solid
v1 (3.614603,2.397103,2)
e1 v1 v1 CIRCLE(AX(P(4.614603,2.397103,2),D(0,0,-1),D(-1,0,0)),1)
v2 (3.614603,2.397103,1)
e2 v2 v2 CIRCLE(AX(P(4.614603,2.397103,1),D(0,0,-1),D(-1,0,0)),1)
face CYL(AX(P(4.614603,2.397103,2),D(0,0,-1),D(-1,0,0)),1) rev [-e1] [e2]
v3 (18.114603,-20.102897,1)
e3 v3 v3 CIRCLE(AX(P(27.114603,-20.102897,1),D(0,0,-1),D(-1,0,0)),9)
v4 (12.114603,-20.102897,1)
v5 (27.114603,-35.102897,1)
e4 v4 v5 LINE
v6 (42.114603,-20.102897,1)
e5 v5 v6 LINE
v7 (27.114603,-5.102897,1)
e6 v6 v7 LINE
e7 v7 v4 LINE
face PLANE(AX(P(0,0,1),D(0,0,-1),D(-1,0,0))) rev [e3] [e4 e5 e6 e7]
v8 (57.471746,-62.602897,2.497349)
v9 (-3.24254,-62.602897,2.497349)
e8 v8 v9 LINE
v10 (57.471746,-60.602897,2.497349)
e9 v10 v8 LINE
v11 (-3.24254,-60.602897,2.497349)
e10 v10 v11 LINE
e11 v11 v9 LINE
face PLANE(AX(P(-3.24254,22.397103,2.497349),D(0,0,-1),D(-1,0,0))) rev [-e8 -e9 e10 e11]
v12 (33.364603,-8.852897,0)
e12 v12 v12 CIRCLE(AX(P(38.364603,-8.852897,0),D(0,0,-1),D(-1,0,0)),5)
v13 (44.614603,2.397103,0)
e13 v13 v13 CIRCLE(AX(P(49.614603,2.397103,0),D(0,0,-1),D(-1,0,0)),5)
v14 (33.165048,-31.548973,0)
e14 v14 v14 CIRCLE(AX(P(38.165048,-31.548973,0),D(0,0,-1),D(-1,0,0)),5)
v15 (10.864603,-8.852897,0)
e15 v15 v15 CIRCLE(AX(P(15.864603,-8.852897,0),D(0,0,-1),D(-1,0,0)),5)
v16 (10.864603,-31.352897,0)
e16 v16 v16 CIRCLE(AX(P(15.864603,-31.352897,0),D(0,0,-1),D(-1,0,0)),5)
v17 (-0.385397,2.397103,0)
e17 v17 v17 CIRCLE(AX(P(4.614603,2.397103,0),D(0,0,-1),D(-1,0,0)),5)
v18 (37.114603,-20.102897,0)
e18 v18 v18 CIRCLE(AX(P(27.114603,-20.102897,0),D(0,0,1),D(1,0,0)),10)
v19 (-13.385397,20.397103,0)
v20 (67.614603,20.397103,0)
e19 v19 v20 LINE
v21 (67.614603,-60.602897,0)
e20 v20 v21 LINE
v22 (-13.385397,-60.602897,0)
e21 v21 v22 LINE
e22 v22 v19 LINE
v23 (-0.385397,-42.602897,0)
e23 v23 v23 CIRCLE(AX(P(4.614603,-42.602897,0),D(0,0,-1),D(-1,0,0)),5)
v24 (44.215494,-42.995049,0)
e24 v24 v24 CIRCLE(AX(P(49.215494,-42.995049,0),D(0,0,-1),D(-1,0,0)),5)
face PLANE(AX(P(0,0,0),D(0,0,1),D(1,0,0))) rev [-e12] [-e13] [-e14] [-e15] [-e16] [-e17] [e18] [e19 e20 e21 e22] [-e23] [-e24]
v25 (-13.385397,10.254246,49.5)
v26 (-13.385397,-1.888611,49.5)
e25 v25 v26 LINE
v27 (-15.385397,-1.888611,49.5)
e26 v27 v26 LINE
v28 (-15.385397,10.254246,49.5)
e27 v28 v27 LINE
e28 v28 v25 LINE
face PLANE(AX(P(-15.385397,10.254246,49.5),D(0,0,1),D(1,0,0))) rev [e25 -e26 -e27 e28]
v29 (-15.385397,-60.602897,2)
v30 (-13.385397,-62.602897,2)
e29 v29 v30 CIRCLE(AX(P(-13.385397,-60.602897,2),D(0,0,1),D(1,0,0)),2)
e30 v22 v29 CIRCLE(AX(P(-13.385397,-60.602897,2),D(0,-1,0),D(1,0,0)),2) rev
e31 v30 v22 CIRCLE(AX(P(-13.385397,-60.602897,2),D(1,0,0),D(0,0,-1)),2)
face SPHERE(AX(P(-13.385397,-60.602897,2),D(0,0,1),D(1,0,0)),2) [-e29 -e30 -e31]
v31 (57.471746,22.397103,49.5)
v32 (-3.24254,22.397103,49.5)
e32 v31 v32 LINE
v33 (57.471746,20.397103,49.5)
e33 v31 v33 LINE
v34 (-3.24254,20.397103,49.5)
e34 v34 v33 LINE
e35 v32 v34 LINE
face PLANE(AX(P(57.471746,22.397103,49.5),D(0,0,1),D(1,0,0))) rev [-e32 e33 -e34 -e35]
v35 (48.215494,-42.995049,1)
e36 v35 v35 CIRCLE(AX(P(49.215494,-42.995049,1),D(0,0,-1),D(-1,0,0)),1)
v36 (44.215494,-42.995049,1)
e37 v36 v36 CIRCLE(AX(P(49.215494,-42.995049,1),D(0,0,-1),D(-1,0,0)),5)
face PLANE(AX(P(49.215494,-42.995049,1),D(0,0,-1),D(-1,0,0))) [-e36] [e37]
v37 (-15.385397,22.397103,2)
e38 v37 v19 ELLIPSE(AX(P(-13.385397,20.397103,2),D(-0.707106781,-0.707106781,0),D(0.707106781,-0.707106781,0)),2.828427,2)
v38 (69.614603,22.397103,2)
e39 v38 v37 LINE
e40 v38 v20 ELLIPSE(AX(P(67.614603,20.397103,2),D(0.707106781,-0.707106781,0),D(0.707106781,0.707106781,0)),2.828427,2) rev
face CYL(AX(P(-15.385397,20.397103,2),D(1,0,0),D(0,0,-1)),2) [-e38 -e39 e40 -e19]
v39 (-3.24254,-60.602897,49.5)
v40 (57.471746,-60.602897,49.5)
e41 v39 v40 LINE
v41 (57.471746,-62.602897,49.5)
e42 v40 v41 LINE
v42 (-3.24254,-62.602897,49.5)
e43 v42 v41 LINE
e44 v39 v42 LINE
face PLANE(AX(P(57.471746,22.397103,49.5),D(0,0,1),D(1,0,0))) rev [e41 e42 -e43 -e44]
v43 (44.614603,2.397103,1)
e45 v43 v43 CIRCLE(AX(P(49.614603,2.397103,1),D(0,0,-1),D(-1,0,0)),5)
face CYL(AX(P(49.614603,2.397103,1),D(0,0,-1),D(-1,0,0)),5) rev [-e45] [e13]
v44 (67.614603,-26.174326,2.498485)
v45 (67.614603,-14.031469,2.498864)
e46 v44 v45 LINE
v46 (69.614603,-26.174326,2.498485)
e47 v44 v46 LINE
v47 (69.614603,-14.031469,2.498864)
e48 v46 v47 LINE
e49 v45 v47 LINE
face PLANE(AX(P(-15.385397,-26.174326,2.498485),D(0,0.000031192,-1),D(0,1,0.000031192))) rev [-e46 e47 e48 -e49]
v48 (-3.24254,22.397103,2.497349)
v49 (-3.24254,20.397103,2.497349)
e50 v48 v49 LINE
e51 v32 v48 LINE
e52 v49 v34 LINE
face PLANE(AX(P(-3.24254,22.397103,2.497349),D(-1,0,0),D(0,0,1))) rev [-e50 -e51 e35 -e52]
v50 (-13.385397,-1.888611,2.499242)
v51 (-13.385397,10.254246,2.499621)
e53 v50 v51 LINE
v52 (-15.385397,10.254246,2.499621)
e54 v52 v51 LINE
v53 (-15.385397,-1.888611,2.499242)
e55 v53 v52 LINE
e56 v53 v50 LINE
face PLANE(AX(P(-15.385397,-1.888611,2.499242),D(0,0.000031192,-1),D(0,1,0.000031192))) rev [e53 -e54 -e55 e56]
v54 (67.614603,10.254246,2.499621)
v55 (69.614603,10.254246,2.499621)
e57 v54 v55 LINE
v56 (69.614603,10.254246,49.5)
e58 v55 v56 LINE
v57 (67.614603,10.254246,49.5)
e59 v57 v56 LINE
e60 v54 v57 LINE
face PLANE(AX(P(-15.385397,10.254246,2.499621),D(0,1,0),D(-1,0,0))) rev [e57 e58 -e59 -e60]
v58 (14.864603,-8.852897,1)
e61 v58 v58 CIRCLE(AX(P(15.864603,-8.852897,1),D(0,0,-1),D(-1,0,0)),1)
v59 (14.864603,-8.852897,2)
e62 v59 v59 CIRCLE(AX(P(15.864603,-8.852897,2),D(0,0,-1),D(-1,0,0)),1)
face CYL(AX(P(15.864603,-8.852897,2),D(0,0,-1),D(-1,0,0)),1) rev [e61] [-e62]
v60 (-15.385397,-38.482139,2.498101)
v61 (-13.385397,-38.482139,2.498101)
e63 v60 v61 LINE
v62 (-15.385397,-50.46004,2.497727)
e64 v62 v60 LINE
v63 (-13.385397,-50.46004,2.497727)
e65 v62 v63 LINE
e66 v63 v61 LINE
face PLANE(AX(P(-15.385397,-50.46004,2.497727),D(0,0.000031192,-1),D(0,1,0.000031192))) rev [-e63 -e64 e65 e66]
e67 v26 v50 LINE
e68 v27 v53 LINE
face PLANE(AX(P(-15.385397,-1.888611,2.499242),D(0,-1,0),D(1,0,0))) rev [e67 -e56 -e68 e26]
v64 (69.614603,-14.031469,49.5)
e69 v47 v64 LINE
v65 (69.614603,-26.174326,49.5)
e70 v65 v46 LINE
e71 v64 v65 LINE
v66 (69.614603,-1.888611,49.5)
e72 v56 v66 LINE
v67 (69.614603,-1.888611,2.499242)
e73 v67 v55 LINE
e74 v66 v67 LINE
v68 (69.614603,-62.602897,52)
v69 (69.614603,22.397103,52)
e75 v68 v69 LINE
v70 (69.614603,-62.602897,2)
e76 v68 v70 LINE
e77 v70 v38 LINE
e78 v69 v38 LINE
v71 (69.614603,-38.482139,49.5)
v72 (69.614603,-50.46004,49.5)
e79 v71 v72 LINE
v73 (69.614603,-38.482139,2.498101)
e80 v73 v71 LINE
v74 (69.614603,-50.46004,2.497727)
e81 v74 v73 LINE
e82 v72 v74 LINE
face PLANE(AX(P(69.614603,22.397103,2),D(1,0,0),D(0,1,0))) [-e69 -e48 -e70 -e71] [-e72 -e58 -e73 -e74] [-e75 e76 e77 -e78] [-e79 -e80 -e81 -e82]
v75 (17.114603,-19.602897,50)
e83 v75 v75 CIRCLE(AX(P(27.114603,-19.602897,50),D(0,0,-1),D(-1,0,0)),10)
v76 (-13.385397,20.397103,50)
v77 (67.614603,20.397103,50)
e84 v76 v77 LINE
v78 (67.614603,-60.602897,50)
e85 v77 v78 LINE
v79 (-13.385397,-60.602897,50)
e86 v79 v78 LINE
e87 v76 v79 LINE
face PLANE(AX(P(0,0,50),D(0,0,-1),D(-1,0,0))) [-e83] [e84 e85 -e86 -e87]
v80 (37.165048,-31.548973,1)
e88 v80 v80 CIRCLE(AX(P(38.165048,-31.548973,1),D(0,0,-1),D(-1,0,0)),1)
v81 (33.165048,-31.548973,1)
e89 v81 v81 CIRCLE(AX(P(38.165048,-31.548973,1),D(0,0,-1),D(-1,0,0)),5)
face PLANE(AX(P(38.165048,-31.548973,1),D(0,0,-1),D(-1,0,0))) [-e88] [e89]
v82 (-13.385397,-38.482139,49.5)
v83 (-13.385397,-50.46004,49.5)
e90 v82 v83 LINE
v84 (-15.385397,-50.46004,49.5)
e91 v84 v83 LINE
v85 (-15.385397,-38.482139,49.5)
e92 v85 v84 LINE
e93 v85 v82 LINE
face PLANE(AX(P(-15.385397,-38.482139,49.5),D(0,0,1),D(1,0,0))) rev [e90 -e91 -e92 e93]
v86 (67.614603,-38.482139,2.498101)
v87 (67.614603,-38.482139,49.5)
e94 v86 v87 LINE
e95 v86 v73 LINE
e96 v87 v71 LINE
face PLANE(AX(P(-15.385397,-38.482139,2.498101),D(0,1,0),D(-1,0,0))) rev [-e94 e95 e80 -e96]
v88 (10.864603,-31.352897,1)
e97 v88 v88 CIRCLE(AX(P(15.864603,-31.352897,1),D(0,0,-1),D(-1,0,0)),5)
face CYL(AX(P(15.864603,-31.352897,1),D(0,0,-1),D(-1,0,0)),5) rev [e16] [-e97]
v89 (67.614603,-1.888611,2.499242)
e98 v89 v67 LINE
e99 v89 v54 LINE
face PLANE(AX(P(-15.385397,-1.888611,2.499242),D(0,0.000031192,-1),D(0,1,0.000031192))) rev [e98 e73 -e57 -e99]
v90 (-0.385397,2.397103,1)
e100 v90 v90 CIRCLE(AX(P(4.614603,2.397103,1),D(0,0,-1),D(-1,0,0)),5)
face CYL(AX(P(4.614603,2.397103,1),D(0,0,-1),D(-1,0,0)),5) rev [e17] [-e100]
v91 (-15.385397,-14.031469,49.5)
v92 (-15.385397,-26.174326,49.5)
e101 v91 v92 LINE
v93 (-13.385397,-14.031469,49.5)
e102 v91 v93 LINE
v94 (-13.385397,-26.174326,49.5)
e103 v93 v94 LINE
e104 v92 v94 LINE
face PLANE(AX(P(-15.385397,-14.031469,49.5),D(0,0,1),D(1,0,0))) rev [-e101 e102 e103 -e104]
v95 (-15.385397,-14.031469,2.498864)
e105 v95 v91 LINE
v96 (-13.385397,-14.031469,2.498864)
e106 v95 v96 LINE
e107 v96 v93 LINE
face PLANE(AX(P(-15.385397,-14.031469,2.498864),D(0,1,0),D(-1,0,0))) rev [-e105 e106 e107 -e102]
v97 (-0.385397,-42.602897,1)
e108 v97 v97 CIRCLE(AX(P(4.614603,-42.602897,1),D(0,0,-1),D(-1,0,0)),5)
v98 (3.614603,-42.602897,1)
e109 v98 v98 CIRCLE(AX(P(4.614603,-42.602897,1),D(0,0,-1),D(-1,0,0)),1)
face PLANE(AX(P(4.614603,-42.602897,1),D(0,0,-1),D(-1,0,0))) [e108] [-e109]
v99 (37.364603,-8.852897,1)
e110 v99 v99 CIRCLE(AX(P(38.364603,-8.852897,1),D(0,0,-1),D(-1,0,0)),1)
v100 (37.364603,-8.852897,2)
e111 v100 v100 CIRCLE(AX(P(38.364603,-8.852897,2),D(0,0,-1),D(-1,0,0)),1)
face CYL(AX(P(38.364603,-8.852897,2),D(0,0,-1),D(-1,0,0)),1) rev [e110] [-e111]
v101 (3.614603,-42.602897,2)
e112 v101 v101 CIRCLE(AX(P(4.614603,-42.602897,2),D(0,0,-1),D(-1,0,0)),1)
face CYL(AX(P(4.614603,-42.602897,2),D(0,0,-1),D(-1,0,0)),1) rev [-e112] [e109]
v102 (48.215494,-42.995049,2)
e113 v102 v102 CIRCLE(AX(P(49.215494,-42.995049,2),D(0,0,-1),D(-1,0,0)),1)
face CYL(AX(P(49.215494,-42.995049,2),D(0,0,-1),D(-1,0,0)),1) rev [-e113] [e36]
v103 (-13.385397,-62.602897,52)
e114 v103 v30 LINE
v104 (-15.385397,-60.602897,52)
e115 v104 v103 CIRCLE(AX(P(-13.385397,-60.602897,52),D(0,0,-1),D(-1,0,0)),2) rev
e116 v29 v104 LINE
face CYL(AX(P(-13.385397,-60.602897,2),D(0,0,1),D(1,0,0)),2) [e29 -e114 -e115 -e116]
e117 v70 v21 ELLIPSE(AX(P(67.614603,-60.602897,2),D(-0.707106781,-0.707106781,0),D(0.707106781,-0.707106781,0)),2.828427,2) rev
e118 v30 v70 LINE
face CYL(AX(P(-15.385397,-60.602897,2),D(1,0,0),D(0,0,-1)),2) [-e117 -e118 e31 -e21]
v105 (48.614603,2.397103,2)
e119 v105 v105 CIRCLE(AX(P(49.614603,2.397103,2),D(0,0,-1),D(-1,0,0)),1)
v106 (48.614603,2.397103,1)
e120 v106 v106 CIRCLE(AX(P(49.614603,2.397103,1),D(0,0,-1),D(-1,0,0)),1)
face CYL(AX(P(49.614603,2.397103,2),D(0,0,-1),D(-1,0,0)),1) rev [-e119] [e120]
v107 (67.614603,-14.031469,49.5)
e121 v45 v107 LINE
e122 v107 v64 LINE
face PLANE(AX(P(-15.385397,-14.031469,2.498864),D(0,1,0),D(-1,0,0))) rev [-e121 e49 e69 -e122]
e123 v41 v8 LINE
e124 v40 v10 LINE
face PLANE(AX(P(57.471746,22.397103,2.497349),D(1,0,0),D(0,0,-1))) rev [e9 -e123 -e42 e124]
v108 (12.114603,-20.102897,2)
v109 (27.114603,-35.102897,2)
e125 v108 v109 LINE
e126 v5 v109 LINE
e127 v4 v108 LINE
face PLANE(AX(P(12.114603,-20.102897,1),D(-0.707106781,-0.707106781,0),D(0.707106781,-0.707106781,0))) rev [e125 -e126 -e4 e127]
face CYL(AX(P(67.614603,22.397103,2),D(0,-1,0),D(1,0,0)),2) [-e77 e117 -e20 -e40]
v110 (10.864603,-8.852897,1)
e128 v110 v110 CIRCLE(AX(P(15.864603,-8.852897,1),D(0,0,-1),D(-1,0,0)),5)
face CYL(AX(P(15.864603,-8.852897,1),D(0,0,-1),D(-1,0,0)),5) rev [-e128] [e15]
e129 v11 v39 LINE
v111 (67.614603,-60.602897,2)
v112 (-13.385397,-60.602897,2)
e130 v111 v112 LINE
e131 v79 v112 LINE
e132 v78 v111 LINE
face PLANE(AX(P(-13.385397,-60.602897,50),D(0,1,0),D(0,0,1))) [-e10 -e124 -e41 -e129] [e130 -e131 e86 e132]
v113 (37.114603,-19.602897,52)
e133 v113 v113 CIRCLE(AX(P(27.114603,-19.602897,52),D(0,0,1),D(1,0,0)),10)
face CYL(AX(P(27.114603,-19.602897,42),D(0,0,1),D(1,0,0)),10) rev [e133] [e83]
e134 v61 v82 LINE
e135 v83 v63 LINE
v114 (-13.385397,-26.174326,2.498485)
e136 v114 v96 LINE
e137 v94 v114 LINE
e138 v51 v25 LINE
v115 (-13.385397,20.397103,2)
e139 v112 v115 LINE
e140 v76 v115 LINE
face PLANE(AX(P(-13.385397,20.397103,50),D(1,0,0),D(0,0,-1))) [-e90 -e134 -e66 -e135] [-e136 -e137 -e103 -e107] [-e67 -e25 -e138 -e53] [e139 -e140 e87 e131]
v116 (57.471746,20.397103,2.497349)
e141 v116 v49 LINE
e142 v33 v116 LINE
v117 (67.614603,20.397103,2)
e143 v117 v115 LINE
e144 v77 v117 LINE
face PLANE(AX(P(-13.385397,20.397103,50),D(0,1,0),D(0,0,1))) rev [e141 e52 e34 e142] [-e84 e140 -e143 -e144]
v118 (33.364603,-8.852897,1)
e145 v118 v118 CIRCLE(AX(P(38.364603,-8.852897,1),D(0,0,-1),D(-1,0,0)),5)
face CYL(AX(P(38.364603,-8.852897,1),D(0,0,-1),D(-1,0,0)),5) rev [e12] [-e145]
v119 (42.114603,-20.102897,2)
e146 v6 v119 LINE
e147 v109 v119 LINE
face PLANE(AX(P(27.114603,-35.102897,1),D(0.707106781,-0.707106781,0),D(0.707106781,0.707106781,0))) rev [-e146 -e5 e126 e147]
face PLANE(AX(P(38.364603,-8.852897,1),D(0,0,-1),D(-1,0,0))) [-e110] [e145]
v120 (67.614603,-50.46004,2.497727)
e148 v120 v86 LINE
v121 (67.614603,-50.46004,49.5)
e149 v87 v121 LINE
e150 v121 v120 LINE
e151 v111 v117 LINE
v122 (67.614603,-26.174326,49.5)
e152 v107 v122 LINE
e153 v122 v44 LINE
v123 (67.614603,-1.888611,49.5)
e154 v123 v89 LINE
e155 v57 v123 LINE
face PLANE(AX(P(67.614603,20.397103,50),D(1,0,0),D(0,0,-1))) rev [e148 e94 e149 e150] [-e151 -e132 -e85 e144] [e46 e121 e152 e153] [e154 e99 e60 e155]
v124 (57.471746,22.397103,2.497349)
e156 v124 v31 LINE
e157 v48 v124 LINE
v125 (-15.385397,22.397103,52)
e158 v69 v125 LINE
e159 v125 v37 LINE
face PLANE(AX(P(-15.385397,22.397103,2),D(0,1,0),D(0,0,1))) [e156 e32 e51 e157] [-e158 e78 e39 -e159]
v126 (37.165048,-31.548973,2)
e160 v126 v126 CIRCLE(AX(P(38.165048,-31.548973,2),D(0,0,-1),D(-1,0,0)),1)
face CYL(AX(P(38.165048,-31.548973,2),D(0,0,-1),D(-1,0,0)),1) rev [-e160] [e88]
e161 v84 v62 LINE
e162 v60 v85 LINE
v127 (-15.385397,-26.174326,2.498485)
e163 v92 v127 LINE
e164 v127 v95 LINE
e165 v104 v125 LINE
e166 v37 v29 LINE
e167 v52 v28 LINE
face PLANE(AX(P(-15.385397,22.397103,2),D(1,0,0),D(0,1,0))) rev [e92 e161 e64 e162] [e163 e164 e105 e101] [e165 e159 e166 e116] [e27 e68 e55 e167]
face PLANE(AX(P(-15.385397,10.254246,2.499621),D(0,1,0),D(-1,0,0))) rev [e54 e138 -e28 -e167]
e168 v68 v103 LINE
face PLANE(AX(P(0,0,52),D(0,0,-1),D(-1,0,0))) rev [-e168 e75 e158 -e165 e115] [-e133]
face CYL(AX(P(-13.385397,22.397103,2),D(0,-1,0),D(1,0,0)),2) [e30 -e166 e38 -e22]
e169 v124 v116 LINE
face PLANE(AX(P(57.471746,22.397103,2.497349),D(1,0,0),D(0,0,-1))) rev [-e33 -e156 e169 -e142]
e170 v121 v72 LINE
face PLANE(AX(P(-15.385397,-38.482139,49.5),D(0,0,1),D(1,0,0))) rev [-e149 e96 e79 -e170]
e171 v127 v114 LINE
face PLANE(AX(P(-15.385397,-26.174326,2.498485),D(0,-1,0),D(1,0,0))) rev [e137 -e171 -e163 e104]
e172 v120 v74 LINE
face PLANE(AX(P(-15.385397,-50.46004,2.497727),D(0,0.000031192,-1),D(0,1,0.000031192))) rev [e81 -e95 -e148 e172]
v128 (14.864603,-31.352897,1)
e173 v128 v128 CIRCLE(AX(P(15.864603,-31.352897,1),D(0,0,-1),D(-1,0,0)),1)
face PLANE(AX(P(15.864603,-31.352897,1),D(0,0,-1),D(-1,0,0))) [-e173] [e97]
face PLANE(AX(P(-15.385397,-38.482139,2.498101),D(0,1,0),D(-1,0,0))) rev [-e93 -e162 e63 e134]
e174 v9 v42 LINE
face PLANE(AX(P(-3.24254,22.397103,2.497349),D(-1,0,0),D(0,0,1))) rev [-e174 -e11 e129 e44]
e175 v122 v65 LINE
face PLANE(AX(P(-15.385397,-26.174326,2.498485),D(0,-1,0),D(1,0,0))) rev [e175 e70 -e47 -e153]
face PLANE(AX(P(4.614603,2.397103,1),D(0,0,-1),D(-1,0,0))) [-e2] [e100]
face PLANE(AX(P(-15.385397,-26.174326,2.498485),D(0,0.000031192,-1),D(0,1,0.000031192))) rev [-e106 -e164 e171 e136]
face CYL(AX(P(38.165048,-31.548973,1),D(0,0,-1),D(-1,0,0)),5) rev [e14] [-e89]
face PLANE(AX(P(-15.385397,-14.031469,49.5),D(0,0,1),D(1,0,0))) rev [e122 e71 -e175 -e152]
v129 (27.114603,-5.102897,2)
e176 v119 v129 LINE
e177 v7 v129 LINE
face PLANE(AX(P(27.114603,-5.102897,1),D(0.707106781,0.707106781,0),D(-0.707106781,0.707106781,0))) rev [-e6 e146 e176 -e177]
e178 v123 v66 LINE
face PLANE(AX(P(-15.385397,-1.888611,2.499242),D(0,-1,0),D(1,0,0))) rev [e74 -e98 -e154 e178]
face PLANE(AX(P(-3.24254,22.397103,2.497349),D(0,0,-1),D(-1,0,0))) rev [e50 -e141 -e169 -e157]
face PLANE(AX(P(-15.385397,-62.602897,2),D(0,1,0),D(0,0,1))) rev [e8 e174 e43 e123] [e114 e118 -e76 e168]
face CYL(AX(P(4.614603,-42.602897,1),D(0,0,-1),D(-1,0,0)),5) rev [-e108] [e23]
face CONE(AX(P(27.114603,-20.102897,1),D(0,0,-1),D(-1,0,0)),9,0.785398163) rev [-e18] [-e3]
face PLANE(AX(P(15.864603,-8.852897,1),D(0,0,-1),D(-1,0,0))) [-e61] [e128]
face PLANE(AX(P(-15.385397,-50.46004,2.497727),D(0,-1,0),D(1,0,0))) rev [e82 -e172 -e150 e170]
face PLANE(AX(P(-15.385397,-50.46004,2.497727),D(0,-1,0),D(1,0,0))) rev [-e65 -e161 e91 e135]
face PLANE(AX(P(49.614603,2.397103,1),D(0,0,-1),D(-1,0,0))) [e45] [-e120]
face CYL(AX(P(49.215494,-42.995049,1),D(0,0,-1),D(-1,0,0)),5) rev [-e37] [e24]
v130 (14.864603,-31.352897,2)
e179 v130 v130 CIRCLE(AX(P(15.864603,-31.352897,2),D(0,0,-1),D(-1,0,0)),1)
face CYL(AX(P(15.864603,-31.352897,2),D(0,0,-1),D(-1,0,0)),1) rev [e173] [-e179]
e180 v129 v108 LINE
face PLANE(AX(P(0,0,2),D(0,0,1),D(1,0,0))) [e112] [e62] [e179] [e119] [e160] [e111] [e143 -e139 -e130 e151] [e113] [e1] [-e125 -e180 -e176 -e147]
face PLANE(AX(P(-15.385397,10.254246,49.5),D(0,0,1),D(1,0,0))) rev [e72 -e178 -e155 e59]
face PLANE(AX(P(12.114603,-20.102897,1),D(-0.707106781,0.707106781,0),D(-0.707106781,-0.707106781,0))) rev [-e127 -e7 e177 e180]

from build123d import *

# Parameters (mm, degrees)
SKETCH_1_W               = 85
SKETCH_1_H               = 85
EXTRUDE_1_DEPTH          = 2
SKETCH_2_R               = 9
CUT_EXTRUDE_1_DEPTH      = 2
SKETCH_4_R               = 5
CUT_EXTRUDE_4_DEPTH      = 1
SKETCH_5_R               = 1
CUT_EXTRUDE_5_DEPTH      = 94.644624303
SKETCH_1_3_W             = 85
SKETCH_1_3_H             = 85
SKETCH_1_3_W_2           = 81
SKETCH_1_3_H_2           = 81
EXTRUDE_2_DEPTH          = 50
SKETCH_7_W               = 85
SKETCH_7_H               = 85
EXTRUDE_3_DEPTH          = 2
CUT_EXTRUDE_6_DEPTH      = 118.678046964
CUT_EXTRUDE_6_DEPTH_BACK = 118.678046964
CUT_EXTRUDE_7_DEPTH      = 122.55325139
CUT_EXTRUDE_7_DEPTH_BACK = 122.55325139
SKETCH_10_W              = 60.714285714
SKETCH_10_H              = 47.002651285
CHAMFER_4_SIZE           = 1
FILLET_1_R               = 2
FILLET_2_R               = 2
SKETCH_11_R              = 10
CUT_EXTRUDE_8_DEPTH      = 10
CUT_EXTRUDE_9_DEPTH      = 1


with BuildPart() as part:
    # 草图1 → 凸台-拉伸1 (new body)
    with BuildSketch(Plane.XY):
        with Locations((27.114602804, -20.102897196)):
            Rectangle(SKETCH_1_W, SKETCH_1_H)
    extrude(amount=EXTRUDE_1_DEPTH)

    # 草图2 → 切除-拉伸1 (cut)
    with BuildSketch(Plane(origin=(0, 0, 0), x_dir=(-1, 0, 0), z_dir=(0, 0, -1))):
        with Locations((-27.114602804, -20.102897196)):
            Circle(SKETCH_2_R)
    extrude(amount=-CUT_EXTRUDE_1_DEPTH, mode=Mode.SUBTRACT)

    # 草图4 → 切除-拉伸4 (cut)
    with BuildSketch(Plane(origin=(0, 0, 0), x_dir=(-1, 0, 0), z_dir=(0, 0, -1))):
        with Locations((-49.215493554, -42.995049302)):
            Circle(SKETCH_4_R)
        with Locations((-38.165048179, -31.548973249)):
            Circle(SKETCH_4_R)
        with Locations((-49.614602804, 2.397102804)):
            Circle(SKETCH_4_R)
        with Locations((-38.364602804, -8.852897196)):
            Circle(SKETCH_4_R)
        with Locations((-4.614602804, -42.602897196)):
            Circle(SKETCH_4_R)
        with Locations((-15.864602804, -31.352897196)):
            Circle(SKETCH_4_R)
        with Locations((-4.614602804, 2.397102804)):
            Circle(SKETCH_4_R)
        with Locations((-15.864602804, -8.852897196)):
            Circle(SKETCH_4_R)
    extrude(amount=-CUT_EXTRUDE_4_DEPTH, mode=Mode.SUBTRACT)

    # 草图5 → 切除-拉伸5 (cut, through all)
    with BuildSketch(Plane(origin=(0, 0, 0), x_dir=(-1, 0, 0), z_dir=(0, 0, -1))):
        with Locations((-4.614602804, -42.602897196)):
            Circle(SKETCH_5_R)
        with Locations((-15.864602804, -31.352897196)):
            Circle(SKETCH_5_R)
        with Locations((-15.864602804, -8.852897196)):
            Circle(SKETCH_5_R)
        with Locations((-4.614602804, 2.397102804)):
            Circle(SKETCH_5_R)
        with Locations((-38.364602804, -8.852897196)):
            Circle(SKETCH_5_R)
        with Locations((-49.614602804, 2.397102804)):
            Circle(SKETCH_5_R)
        with Locations((-49.215493554, -42.995049302)):
            Circle(SKETCH_5_R)
        with Locations((-38.165048179, -31.548973249)):
            Circle(SKETCH_5_R)
    extrude(amount=-CUT_EXTRUDE_5_DEPTH, mode=Mode.SUBTRACT)

    # 草图1<3> → 凸台-拉伸2 (add)
    with BuildSketch(Plane.XY):
        with Locations((27.114602804, -20.102897196)):
            Rectangle(SKETCH_1_3_W, SKETCH_1_3_H)
        with Locations((27.114602804, -20.102897196)):
            Rectangle(SKETCH_1_3_W_2, SKETCH_1_3_H_2, mode=Mode.SUBTRACT)
    extrude(amount=EXTRUDE_2_DEPTH)

    # 草图7 → 凸台-拉伸3 (add)
    with BuildSketch(Plane.XY.offset(50)):
        with Locations((27.114602804, -20.102897196)):
            Rectangle(SKETCH_7_W, SKETCH_7_H)
    extrude(amount=EXTRUDE_3_DEPTH)

    # 草图9 → 切除-拉伸6 (cut, two sides: drawn at the far end of the back side and taken through both)
    with BuildSketch(Plane(origin=(69.614602804, 0, 0), x_dir=(0, 0, -1), z_dir=(1, 0, 0)).offset(-CUT_EXTRUDE_6_DEPTH_BACK)):
        Polygon((-2.49772747, -50.460040053), (-49.5, -50.460040053), (-49.5, -38.482138921), (-2.49810108, -38.482138921), align=None)
        Polygon((-2.49848498, -26.174325768), (-49.5, -26.174325768), (-49.5, -14.031468625), (-2.498863735, -14.031468625), align=None)
        Polygon((-2.49924249, -1.888611482), (-49.5, -1.888611482), (-49.5, 10.254245661), (-2.499621245, 10.254245661), align=None)
    extrude(amount=CUT_EXTRUDE_6_DEPTH + CUT_EXTRUDE_6_DEPTH_BACK, mode=Mode.SUBTRACT)

    # 草图10 → 切除-拉伸7 (cut, two sides: drawn at the far end of the back side and taken through both)
    with BuildSketch(Plane.XZ.offset(62.602897196).offset(-CUT_EXTRUDE_7_DEPTH_BACK)):
        with Locations((27.114602804, 25.998674358)):
            Rectangle(SKETCH_10_W, SKETCH_10_H)
    extrude(amount=CUT_EXTRUDE_7_DEPTH + CUT_EXTRUDE_7_DEPTH_BACK, mode=Mode.SUBTRACT)

    # 倒角4
    chamfer_4_edges = [part.edges().sort_by_distance(p)[0] for p in [
        (36.114602804, -20.102897196, 0),
    ]]
    chamfer(chamfer_4_edges, length=CHAMFER_4_SIZE)

    # 圆角1
    fillet_1_edges = [part.edges().sort_by_distance(p)[0] for p in [
        (27.114602804, 22.397102804, 0),
        (69.614602804, -20.102897196, 0),
        (27.114602804, -62.602897196, 0),
        (-15.385397196, -20.102897196, 0),
    ]]
    fillet(fillet_1_edges, radius=FILLET_1_R)

    # 圆角2
    # the kernel refuses this fillet: 2 mm, written as the material it takes off along each edge
    with BuildSketch(Plane(origin=(-13.385397196, -60.602897196, 2), x_dir=(0, -1, 0), z_dir=(-1, 0, 0))) as fillet_2_piece_1_section:
        Polygon((0, 0), (FILLET_2_R, 0), (FILLET_2_R, -FILLET_2_R), (0, -FILLET_2_R), align=None)
    fillet_2_piece_1 = extrude(amount=FILLET_2_R, mode=Mode.PRIVATE)
    fillet_2_piece_1 = fillet_2_piece_1 - Plane(origin=(-13.385397196, -60.602897196, 2), x_dir=(0, 0.7071067811865475, 0.7071067811865475), z_dir=(-1, 0, 0)) * Sphere(FILLET_2_R, mode=Mode.PRIVATE)
    add(fillet_2_piece_1, mode=Mode.SUBTRACT)
    with BuildSketch(Plane(origin=(-15.385397196, -62.602897196, 2), x_dir=(0, 1, 0), z_dir=(0, 0, 1))) as fillet_2_piece_2:
        with BuildLine():
            CenterArc((FILLET_2_R, -FILLET_2_R), FILLET_2_R, 90, 90)
            Line((0, -FILLET_2_R), (0, 0))
            Line((0, 0), (FILLET_2_R, 0))
        make_face()
    extrude(amount=55, mode=Mode.SUBTRACT)

    # 草图11 → 切除-拉伸8 (cut)
    with BuildSketch(Plane.XY.offset(52)):
        with Locations((27.114602804, -19.602897196)):
            Circle(SKETCH_11_R)
    extrude(amount=-CUT_EXTRUDE_8_DEPTH, mode=Mode.SUBTRACT)

    # 草图12 → 切除-拉伸9 (cut)
    with BuildSketch(Plane.XY.offset(2)):
        Polygon((12.114602804, -20.102897196), (27.114602804, -35.102897196), (42.114602804, -20.102897196), (27.114602804, -5.102897196), align=None)
    extrude(amount=-CUT_EXTRUDE_9_DEPTH, mode=Mode.SUBTRACT)


solid = part.part
